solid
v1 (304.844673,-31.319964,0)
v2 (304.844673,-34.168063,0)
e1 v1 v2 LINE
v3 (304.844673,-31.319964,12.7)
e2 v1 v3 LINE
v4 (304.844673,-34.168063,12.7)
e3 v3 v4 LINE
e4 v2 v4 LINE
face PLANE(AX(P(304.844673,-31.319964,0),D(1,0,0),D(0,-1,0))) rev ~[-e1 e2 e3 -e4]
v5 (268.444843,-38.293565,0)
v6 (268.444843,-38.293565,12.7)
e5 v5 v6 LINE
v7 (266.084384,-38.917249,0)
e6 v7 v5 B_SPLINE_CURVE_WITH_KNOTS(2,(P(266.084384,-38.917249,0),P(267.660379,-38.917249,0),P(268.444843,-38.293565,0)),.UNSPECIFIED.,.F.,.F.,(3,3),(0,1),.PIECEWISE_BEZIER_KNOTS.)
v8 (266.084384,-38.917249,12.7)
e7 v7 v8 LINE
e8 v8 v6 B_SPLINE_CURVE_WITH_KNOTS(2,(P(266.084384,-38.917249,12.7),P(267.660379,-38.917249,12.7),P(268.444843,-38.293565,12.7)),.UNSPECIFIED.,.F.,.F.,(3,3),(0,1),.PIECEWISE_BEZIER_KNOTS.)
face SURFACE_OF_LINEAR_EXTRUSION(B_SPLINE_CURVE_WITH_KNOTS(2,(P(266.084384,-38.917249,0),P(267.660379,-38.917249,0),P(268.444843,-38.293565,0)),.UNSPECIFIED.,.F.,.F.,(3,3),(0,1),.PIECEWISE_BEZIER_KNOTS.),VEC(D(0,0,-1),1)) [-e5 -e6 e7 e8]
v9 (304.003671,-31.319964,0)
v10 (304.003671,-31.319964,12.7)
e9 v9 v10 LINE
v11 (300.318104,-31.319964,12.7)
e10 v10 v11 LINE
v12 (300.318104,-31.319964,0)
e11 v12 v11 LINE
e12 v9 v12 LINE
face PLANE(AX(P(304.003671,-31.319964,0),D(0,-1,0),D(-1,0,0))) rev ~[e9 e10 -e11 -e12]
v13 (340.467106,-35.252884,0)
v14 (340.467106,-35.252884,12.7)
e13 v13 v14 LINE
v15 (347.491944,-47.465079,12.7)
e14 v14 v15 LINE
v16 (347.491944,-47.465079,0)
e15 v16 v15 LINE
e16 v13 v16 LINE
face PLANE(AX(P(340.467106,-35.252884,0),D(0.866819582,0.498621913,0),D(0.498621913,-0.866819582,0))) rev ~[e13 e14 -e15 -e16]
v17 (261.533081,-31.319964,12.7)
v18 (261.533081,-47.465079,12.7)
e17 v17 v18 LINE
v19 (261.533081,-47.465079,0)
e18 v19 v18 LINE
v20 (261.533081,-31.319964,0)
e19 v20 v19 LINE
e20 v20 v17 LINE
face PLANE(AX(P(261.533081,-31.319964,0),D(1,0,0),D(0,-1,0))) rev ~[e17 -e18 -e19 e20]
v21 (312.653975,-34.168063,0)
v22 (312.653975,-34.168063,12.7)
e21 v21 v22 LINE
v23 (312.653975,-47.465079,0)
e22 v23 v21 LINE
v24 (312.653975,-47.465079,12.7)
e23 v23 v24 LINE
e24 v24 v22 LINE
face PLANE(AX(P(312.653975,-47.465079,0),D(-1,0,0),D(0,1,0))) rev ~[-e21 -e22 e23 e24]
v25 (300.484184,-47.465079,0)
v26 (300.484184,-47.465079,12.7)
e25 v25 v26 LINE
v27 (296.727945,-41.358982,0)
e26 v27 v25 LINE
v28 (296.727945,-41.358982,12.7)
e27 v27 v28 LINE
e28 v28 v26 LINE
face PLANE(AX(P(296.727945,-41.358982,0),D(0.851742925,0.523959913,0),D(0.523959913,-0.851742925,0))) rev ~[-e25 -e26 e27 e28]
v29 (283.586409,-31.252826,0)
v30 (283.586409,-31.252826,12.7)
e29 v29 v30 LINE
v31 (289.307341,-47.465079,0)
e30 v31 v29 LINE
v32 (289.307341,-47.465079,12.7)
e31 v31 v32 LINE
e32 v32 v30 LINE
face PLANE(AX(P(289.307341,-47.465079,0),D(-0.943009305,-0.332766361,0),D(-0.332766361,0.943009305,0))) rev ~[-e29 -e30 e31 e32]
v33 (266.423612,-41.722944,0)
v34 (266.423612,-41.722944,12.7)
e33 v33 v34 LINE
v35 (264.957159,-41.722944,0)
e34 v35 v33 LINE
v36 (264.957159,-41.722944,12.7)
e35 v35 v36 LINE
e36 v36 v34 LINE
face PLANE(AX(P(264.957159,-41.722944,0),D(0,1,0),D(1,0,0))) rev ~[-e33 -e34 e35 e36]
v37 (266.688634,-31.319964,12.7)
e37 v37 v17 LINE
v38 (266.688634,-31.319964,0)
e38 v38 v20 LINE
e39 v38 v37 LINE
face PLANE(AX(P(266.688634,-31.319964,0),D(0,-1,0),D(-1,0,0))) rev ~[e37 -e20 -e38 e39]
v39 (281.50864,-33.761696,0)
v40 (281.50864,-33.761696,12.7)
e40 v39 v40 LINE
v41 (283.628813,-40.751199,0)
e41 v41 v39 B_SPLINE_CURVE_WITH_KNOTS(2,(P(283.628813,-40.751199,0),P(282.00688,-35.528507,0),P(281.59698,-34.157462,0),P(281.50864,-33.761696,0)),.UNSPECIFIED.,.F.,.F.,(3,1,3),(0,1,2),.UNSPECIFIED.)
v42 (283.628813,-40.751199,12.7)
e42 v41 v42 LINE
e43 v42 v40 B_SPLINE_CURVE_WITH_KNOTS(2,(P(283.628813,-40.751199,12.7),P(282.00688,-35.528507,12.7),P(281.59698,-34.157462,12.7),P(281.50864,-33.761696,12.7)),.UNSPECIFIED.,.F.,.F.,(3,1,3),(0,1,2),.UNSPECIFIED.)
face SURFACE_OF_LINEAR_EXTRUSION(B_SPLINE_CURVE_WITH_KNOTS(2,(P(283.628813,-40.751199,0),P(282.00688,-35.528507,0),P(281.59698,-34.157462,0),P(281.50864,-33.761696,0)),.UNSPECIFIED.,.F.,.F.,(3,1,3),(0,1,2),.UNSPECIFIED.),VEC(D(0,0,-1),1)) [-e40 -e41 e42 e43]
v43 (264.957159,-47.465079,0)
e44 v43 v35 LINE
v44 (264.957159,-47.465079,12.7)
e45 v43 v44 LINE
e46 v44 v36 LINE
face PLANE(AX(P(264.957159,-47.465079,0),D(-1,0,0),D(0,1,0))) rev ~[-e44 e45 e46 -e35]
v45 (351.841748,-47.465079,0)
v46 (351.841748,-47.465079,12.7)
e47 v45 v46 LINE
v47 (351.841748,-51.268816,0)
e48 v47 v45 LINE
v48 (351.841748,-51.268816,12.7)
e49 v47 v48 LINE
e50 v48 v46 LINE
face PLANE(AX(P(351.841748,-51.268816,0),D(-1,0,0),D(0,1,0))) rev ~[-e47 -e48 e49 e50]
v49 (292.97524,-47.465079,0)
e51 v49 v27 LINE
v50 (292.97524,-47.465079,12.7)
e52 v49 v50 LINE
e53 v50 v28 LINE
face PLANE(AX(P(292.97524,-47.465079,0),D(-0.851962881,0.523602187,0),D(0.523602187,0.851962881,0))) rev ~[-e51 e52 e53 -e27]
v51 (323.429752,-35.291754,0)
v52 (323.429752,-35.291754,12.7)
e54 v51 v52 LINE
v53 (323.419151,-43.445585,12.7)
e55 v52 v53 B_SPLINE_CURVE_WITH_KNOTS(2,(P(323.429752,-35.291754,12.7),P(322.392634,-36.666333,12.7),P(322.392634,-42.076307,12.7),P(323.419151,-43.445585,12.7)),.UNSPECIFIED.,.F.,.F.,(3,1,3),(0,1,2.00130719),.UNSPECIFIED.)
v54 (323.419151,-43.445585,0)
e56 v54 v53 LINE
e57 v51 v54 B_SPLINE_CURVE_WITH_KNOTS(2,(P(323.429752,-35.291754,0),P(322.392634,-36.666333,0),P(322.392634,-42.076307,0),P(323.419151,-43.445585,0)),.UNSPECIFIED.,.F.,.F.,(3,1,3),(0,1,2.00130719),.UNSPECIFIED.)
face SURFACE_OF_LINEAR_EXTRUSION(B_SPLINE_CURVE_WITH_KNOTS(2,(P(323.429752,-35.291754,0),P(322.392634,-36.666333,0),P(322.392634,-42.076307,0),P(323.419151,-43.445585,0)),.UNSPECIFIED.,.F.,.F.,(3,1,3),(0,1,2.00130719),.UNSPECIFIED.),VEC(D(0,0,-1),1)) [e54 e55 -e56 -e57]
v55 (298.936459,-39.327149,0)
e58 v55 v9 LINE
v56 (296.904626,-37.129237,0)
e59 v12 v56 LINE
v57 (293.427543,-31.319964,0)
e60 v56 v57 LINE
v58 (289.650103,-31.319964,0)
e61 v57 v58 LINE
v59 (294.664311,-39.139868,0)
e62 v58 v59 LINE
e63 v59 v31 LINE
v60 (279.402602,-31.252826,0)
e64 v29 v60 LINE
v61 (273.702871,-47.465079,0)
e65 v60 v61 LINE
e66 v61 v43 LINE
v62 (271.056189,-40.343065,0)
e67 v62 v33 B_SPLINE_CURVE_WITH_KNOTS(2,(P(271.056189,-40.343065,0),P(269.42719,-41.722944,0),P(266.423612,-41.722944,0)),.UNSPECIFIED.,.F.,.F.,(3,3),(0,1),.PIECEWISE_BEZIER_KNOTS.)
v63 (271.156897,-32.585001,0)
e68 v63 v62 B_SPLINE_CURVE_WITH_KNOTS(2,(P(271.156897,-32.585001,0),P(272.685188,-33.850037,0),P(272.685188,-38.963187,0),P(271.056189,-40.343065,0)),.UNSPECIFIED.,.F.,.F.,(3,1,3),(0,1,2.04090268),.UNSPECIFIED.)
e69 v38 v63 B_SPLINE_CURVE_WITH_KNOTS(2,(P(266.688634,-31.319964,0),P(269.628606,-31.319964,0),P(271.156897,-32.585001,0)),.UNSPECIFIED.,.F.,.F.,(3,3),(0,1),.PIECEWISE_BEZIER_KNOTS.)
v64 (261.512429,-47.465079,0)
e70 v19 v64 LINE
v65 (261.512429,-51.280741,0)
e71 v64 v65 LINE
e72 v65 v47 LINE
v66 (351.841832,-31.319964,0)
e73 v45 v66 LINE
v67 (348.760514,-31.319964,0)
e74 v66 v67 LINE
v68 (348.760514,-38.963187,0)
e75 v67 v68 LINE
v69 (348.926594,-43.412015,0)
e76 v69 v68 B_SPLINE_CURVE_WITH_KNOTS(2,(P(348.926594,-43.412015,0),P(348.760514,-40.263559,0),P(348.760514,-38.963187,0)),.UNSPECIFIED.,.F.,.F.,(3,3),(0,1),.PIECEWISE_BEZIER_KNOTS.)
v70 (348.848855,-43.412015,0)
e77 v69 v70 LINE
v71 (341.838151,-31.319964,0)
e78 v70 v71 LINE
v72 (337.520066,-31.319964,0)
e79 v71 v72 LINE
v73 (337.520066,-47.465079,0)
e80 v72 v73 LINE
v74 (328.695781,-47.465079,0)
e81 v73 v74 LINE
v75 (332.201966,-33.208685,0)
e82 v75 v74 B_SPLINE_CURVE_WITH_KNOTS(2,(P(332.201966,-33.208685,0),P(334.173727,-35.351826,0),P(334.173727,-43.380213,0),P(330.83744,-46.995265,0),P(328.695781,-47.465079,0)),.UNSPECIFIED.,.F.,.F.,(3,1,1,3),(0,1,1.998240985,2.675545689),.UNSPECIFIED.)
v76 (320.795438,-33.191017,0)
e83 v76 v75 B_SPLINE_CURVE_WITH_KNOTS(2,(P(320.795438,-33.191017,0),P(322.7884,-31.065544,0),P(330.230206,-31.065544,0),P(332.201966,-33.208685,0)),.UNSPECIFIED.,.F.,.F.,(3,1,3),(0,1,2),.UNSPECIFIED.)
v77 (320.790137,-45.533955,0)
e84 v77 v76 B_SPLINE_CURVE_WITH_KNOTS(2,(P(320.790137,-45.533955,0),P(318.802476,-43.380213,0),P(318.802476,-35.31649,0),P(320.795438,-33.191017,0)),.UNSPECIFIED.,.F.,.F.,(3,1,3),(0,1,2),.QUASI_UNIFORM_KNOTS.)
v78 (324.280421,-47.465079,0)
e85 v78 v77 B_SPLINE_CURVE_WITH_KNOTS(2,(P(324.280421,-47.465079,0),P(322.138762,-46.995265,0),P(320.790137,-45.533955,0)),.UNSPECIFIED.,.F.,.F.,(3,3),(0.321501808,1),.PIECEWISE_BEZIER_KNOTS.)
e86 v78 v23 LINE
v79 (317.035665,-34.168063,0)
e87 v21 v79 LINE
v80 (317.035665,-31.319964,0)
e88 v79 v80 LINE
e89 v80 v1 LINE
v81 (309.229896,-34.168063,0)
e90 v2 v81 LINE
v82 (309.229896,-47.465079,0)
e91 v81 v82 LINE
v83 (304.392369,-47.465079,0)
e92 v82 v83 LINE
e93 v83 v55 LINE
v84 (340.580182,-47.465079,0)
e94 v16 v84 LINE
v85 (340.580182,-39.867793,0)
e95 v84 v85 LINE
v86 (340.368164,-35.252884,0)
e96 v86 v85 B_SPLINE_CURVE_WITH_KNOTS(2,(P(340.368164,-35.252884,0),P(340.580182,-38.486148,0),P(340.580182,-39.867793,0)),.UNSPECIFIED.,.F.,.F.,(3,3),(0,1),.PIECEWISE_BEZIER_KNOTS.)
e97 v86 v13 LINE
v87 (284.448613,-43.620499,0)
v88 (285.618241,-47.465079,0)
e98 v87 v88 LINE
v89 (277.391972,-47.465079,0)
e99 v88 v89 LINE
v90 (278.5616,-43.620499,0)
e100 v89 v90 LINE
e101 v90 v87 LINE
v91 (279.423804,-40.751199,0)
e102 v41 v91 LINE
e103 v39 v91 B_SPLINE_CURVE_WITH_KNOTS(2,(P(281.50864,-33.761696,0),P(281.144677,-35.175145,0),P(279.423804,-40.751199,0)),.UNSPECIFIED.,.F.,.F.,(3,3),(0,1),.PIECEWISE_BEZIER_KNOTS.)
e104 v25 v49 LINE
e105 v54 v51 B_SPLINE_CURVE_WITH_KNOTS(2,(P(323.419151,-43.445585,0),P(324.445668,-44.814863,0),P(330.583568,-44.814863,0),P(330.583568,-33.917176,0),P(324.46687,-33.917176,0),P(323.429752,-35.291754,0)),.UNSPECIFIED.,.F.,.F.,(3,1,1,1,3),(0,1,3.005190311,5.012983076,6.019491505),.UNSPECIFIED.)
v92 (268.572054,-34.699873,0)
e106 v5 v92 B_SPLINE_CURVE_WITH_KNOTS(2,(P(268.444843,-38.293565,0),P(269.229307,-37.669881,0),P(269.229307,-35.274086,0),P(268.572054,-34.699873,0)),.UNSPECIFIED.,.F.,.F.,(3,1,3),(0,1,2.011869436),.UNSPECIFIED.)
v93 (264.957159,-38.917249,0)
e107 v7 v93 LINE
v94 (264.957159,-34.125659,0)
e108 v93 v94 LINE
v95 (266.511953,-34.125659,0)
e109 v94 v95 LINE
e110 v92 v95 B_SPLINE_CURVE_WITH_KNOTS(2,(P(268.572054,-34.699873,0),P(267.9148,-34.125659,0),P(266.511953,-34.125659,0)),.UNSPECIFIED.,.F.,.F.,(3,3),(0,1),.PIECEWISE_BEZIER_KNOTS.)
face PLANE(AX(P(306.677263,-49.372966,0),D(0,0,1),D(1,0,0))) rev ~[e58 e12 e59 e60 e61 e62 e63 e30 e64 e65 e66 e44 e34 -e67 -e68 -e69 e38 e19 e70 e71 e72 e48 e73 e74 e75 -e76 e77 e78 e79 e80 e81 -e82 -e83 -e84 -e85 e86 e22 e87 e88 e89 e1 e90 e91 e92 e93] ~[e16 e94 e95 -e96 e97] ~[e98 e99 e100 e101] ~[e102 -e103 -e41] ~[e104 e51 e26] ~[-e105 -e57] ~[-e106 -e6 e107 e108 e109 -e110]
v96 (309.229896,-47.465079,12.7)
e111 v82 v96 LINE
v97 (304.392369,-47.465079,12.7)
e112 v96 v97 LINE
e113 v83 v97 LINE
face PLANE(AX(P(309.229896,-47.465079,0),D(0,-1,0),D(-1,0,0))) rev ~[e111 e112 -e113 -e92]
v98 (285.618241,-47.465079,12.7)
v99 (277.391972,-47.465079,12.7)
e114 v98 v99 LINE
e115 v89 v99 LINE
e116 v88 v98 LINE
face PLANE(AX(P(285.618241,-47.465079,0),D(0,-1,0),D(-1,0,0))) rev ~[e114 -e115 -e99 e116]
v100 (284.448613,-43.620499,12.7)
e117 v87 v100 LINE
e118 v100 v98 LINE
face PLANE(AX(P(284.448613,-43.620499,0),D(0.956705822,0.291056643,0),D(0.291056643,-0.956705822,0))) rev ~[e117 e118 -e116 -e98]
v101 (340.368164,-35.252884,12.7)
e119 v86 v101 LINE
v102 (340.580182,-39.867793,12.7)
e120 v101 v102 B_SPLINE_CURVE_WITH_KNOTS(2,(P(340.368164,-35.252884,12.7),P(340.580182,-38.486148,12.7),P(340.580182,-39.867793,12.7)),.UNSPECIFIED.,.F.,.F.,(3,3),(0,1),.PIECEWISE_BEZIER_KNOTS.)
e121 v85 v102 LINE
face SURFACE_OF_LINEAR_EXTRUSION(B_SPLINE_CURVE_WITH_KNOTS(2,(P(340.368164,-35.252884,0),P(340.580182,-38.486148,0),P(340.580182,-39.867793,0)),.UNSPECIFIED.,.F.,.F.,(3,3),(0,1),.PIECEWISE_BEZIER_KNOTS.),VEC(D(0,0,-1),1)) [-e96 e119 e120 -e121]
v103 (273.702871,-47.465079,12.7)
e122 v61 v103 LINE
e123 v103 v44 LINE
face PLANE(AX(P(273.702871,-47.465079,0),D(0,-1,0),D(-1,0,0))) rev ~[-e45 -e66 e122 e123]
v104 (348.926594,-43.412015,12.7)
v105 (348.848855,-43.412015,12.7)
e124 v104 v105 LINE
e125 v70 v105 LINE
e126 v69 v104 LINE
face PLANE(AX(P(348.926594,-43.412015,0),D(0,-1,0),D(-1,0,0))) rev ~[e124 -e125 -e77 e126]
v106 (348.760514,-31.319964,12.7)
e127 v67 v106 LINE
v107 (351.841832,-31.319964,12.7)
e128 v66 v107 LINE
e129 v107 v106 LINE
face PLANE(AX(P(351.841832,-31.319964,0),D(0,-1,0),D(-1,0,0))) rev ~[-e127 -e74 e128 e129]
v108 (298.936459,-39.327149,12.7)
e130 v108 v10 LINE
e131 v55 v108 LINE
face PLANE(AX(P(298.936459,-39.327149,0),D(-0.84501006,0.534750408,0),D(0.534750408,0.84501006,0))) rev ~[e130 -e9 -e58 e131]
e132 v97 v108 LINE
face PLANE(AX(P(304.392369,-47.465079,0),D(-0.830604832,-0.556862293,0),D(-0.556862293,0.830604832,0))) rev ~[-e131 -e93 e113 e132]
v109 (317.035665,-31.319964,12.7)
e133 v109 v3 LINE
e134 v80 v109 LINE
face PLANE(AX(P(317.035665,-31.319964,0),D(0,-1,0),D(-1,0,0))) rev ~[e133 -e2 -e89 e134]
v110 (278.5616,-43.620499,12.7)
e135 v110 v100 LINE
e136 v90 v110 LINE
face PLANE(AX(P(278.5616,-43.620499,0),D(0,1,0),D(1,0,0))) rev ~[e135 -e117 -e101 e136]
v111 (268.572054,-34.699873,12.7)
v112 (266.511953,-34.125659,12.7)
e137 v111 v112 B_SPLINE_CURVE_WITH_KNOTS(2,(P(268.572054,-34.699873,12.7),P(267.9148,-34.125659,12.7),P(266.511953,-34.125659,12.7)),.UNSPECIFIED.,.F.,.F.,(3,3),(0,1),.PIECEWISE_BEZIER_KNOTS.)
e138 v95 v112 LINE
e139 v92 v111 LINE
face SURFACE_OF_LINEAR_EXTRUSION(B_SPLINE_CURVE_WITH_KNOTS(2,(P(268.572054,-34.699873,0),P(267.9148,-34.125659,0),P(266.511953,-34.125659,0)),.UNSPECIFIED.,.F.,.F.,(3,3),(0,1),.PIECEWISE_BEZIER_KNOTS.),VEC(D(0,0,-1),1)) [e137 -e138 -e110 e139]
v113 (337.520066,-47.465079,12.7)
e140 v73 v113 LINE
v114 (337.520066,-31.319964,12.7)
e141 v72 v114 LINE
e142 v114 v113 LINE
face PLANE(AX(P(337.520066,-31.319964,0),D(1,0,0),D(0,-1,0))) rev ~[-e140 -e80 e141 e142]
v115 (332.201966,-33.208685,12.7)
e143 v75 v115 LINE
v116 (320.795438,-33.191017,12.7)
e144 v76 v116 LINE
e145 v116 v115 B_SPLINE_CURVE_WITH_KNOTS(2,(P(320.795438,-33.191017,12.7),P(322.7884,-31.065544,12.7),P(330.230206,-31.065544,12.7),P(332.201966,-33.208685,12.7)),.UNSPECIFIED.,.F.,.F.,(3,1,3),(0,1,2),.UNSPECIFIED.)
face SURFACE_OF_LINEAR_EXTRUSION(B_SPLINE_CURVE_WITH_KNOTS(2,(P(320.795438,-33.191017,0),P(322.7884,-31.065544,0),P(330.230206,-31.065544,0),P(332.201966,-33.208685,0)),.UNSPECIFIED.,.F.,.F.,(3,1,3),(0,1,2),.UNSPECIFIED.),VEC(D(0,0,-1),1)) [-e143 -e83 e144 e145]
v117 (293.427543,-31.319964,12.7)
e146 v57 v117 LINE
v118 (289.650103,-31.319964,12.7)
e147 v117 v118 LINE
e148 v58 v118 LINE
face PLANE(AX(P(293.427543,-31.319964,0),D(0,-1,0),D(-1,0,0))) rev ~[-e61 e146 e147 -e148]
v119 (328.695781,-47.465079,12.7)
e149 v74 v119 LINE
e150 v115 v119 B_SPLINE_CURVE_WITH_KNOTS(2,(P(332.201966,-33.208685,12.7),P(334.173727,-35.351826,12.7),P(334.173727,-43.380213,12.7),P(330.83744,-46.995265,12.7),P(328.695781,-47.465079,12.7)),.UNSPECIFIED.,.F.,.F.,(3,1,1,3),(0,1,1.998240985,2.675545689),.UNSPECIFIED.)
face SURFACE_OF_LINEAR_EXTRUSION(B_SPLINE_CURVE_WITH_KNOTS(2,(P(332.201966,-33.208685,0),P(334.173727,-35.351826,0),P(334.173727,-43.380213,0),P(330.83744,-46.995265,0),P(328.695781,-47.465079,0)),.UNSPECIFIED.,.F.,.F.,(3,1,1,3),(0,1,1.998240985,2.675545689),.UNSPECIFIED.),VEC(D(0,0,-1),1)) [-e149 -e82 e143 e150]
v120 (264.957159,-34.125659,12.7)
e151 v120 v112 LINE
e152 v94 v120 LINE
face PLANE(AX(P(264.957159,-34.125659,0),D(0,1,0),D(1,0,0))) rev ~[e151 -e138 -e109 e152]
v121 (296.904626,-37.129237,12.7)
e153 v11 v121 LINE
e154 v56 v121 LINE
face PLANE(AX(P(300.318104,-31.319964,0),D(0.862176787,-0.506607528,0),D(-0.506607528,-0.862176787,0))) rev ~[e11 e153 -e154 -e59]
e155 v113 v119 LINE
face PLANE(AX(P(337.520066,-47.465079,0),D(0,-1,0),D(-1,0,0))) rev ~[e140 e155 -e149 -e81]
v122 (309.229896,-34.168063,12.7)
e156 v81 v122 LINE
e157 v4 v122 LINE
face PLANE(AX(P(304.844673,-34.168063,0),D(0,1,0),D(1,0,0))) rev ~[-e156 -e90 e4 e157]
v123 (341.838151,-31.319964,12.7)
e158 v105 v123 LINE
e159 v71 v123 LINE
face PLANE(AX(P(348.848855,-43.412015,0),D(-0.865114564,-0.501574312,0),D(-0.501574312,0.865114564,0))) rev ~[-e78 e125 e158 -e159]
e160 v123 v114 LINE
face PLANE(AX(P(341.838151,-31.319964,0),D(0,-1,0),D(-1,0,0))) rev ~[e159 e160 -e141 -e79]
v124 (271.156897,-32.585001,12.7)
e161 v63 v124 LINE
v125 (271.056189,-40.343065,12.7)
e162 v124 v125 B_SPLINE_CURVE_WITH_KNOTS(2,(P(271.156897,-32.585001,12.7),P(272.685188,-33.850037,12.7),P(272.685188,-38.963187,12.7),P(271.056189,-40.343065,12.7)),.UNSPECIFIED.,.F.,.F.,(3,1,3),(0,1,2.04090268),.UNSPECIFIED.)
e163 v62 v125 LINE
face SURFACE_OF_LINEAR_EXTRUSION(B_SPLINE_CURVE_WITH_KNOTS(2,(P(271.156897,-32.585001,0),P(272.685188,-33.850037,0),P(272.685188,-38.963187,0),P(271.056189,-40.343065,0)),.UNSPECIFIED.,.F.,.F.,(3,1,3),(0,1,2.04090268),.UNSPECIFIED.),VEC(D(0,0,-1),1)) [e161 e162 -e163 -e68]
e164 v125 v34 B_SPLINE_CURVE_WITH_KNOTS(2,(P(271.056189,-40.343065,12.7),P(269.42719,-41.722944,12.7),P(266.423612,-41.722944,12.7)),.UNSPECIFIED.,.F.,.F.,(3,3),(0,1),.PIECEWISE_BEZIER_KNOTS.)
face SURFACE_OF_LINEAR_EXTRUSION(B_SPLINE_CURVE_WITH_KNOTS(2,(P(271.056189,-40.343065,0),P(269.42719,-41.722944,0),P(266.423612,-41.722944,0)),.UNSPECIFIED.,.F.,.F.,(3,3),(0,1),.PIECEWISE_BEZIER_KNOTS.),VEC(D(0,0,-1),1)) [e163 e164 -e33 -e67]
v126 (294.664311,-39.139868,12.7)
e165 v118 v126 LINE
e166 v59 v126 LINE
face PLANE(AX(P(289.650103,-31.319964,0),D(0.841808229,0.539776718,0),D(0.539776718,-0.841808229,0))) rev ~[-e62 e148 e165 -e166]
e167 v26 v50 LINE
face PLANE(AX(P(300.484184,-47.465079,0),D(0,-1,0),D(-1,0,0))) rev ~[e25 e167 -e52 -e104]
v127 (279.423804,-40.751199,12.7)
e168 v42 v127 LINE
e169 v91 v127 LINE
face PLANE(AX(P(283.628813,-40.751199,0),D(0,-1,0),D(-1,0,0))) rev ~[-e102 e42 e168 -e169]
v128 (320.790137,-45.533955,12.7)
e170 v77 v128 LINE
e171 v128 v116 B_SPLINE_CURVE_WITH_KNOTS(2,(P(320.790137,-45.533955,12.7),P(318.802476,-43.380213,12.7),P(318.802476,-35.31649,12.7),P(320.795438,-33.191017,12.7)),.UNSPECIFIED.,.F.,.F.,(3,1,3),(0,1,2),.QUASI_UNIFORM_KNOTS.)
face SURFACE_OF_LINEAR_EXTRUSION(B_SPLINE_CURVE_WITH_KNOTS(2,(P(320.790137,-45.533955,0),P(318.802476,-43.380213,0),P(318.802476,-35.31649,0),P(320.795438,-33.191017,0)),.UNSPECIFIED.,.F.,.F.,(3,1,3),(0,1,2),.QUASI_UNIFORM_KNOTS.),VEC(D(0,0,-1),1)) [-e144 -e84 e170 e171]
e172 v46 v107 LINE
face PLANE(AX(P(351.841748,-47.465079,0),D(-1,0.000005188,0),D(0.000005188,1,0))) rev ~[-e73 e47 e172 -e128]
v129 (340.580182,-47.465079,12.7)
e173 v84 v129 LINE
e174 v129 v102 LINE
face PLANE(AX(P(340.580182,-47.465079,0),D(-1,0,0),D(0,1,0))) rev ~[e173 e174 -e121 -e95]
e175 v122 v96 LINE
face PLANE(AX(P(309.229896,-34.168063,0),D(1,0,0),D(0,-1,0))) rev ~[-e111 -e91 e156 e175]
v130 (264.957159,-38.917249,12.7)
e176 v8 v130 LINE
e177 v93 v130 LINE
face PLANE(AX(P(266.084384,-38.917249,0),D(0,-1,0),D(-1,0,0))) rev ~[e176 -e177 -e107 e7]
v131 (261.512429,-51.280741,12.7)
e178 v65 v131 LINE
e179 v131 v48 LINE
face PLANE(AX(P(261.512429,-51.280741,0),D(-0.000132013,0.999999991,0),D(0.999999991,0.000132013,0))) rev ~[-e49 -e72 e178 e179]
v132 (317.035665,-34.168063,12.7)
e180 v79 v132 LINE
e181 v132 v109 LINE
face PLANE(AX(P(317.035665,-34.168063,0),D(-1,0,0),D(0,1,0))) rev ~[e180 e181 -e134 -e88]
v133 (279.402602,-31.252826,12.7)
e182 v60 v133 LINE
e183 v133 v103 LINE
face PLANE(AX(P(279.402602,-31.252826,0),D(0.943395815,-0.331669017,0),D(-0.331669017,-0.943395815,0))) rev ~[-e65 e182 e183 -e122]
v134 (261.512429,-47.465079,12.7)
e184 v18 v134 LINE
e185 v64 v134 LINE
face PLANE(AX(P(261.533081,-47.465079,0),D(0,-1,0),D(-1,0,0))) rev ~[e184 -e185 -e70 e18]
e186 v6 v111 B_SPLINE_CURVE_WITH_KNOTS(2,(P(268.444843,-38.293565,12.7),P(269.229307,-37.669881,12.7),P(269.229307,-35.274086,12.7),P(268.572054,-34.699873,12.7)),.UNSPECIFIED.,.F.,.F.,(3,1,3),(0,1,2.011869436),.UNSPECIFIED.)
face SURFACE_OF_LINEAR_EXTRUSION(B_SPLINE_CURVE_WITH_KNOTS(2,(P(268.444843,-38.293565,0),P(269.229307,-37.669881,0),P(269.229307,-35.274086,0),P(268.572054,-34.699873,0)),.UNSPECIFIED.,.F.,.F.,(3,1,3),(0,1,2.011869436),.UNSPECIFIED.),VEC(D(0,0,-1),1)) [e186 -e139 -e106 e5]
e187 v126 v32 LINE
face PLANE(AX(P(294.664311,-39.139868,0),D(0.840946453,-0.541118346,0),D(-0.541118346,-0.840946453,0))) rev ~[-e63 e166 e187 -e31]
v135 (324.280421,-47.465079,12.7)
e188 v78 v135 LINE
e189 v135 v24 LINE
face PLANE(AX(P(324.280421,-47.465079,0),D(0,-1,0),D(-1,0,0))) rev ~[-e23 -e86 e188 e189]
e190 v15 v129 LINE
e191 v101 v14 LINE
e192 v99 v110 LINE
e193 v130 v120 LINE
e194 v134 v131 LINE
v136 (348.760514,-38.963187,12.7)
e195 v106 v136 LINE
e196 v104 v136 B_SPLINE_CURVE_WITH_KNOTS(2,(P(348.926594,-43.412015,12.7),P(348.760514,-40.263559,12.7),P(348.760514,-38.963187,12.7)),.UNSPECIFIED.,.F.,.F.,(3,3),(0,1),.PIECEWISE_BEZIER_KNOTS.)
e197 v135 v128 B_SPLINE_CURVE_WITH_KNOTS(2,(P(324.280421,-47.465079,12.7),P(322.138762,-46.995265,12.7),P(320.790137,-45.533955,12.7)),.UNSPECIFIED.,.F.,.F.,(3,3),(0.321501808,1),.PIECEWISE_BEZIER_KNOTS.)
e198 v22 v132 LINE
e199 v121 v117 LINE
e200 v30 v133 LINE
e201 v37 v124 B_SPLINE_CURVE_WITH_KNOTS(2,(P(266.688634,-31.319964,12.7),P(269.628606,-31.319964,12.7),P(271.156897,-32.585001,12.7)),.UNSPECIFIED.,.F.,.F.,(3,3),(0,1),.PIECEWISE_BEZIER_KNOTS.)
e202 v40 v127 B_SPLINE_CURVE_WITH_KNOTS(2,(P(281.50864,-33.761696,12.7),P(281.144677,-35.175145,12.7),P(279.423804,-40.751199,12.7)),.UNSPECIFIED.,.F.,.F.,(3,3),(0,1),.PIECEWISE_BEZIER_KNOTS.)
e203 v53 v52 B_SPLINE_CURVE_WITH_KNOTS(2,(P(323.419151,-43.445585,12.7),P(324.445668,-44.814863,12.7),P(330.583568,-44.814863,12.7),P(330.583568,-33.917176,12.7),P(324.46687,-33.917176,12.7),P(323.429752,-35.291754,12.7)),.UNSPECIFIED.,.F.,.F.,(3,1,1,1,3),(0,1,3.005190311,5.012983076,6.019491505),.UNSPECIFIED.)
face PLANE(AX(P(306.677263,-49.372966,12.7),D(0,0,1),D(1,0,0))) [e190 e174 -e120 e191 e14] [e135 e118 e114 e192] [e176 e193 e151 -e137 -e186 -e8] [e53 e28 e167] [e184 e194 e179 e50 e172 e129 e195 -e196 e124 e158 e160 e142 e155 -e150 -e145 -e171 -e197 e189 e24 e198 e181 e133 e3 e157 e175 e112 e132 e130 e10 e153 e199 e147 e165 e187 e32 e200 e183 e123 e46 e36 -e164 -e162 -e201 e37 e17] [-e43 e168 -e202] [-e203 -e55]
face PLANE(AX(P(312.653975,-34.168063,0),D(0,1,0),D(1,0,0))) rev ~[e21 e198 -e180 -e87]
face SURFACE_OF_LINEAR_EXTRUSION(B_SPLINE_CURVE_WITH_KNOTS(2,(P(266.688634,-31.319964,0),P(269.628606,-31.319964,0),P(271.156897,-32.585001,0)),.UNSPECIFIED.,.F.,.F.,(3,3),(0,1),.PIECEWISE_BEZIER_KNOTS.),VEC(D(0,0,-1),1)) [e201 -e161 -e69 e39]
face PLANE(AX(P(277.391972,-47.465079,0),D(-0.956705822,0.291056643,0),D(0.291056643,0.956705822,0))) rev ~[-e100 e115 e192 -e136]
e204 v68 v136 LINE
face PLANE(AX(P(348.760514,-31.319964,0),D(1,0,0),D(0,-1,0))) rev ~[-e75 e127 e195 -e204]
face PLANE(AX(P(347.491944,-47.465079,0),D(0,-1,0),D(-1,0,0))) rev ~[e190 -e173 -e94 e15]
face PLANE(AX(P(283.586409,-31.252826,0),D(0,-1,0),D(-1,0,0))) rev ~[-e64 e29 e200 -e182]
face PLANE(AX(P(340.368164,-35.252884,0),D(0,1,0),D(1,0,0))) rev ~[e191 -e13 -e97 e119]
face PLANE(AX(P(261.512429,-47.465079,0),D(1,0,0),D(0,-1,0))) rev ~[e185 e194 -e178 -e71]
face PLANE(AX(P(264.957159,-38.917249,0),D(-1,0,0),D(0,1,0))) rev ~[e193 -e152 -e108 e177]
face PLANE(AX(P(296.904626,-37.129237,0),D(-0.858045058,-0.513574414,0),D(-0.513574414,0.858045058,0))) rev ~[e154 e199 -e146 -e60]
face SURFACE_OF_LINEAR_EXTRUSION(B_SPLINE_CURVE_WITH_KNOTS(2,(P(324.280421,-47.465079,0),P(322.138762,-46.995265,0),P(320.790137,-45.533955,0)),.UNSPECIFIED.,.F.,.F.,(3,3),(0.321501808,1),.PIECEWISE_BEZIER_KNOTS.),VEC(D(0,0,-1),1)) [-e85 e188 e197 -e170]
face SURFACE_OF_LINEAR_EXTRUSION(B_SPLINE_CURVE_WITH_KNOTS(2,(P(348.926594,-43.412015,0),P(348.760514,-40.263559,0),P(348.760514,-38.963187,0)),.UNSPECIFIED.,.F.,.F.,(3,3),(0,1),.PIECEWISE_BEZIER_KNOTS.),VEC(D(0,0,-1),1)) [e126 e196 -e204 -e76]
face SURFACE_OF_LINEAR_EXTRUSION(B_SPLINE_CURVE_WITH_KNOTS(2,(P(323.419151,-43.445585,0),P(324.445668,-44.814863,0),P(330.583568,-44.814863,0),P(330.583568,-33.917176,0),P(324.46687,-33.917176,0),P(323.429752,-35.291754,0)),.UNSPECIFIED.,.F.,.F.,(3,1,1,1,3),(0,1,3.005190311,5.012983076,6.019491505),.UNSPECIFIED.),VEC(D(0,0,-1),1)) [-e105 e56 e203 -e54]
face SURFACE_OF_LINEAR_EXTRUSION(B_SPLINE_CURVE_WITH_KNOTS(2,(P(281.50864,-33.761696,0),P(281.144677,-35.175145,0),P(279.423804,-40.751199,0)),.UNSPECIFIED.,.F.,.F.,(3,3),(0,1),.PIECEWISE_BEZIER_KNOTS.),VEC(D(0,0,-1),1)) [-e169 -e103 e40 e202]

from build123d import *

# Parameters (mm, degrees)
F1_DEPTH = 12.7


# Not quite as in the source:
# - ends of sketch curves that miss each other by under 0.0002 mm in the source are joined


with BuildPart() as f1:
    # F0 (on Top) → F1 (new body)
    with BuildSketch(Plane.XY):
        with BuildLine():
            Line((261.5330806499, -47.4650785327), (261.5124285221, -47.4650785327))
            Line((261.5124285221, -47.4650785327), (261.5124285221, -51.2807406485))
            Line((261.5124285221, -51.2807406485), (351.8417477608, -51.2688159943))
            Line((351.8417477608, -51.2688159943), (351.8417477608, -47.4650785327))
            Line((351.8417477608, -47.4650785327), (347.4919441154, -47.4650785327))
            Line((347.4919441154, -47.4650785327), (340.5801815182, -47.4650785327))
            Line((340.5801815182, -47.4650785327), (337.5200657671, -47.4650785327))
            Line((337.5200657671, -47.4650785327), (328.6957807677, -47.4650785327))
            add(Edge.make_bspline(
                [(328.6957807677, -47.4650785327), (327.6809699352, -47.6876966532), (326.488101131, -47.6876966532)],
                knots=[0.6784981919, 0.6784981919, 0.6784981919, 1, 1, 1], degree=2))
            add(Edge.make_bspline(
                [(326.488101131, -47.6876966532), (325.2952323268, -47.6876966532), (324.2804214942, -47.4650785327)],
                knots=[0, 0, 0, 0.3215018081, 0.3215018081, 0.3215018081], degree=2))
            Line((324.2804214942, -47.4650785327), (312.6539750738, -47.4650785327))
            Line((312.6539750738, -47.4650785327), (309.2298963638, -47.4650785327))
            Line((309.2298963638, -47.4650785327), (304.39236927, -47.4650785327))
            Line((304.39236927, -47.4650785327), (300.4841844886, -47.4650785327))
            Line((300.4841844886, -47.4650785327), (292.9752399493, -47.4650785327))
            Line((292.9752399493, -47.4650785327), (289.3073413931, -47.4650785327))
            Line((289.3073413931, -47.4650785327), (285.6182411112, -47.4650785327))
            Line((285.6182411112, -47.4650785327), (277.391971517, -47.4650785327))
            Line((277.391971517, -47.4650785327), (273.7028712351, -47.4650785327))
            Line((273.7028712351, -47.4650785327), (264.9571593599, -47.4650785327))
            Line((264.9571593599, -47.4650785327), (261.5330806499, -47.4650785327))
        make_face()
        with BuildLine():
            Line((261.5330806499, -31.3199643679), (261.5330806499, -47.4650785327))
            Line((261.5330806499, -47.4650785327), (264.9571593599, -47.4650785327))
            Line((264.9571593599, -47.4650785327), (264.9571593599, -41.7229444732))
            Line((264.9571593599, -41.7229444732), (266.4236120581, -41.7229444732))
            add(Edge.make_bspline(
                [(271.0561891363, -40.3430654884), (269.4271898739, -41.7229444732), (266.4236120581, -41.7229444732)],
                knots=[0, 0, 0, 1, 1, 1], degree=2))
            add(Edge.make_bspline(
                [(272.6851883987, -36.3553742354), (272.6851883987, -38.9631865037), (271.0561891363, -40.3430654884)],
                knots=[0, 0, 0, 1, 1, 1], degree=2))
            add(Edge.make_bspline(
                [(271.1568973336, -32.5850006714), (272.6851883987, -33.850036975), (272.6851883987, -36.3553742354)],
                knots=[0, 0, 0, 1, 1, 1], degree=2))
            add(Edge.make_bspline(
                [(266.6886336301, -31.3199643679), (269.6286062686, -31.3199643679), (271.1568973336, -32.5850006714)],
                knots=[0, 0, 0, 1, 1, 1], degree=2))
            Line((266.6886336301, -31.3199643679), (261.5330806499, -31.3199643679))
        make_face()
        with BuildLine():
            Line((266.084384446, -38.9172494312), (264.9571593599, -38.9172494312))
            Line((264.9571593599, -38.9172494312), (264.9571593599, -34.1256594099))
            Line((264.9571593599, -34.1256594099), (266.5119525821, -34.1256594099))
            add(Edge.make_bspline(
                [(268.5720536016, -34.6998728158), (267.9148001031, -34.1256594099), (266.5119525821, -34.1256594099)],
                knots=[0, 0, 0, 1, 1, 1], degree=2))
            add(Edge.make_bspline(
                [(269.2293071001, -36.479050969), (269.2293071001, -35.2740862218), (268.5720536016, -34.6998728158)],
                knots=[0, 0, 0, 1, 1, 1], degree=2))
            add(Edge.make_bspline(
                [(268.4448432471, -38.2935653318), (269.2293071001, -37.6698812324), (269.2293071001, -36.479050969)],
                knots=[0, 0, 0, 1, 1, 1], degree=2))
            add(Edge.make_bspline(
                [(266.084384446, -38.9172494312), (267.660379394, -38.9172494312), (268.4448432471, -38.2935653318)],
                knots=[0, 0, 0, 1, 1, 1], degree=2))
        make_face(mode=Mode.SUBTRACT)
        with BuildLine():
            Line((347.4919441154, -47.4650785327), (351.8417477608, -47.4650785327))
            Line((351.8417477608, -47.4650785327), (351.8418315167, -31.3199643679))
            Line((351.8418315167, -31.3199643679), (348.7605140399, -31.3199643679))
            Line((348.7605140399, -31.3199643679), (348.7605140399, -38.9631865037))
            add(Edge.make_bspline(
                [(348.926594225, -43.4120152919), (348.7605140399, -40.2635590168), (348.7605140399, -38.9631865037)],
                knots=[0, 0, 0, 1, 1, 1], degree=2))
            Line((348.926594225, -43.4120152919), (348.8488545639, -43.4120152919))
            Line((348.8488545639, -43.4120152919), (341.8381505799, -31.3199643679))
            Line((341.8381505799, -31.3199643679), (337.5200657671, -31.3199643679))
            Line((337.5200657671, -31.3199643679), (337.5200657671, -47.4650785327))
            Line((337.5200657671, -47.4650785327), (340.5801815182, -47.4650785327))
            Line((340.5801815182, -47.4650785327), (340.5801815182, -39.8677934694))
            add(Edge.make_bspline(
                [(340.3681642606, -35.252884496), (340.5801815182, -38.4861476741), (340.5801815182, -39.8677934694)],
                knots=[0, 0, 0, 1, 1, 1], degree=2))
            Line((340.3681642606, -35.252884496), (340.4671056475, -35.252884496))
            Line((340.4671056475, -35.252884496), (347.4919441154, -47.4650785327))
        make_face()
        Polygon((279.4026018431, -31.2528255696), (273.7028712351, -47.4650785327), (277.391971517, -47.4650785327), (278.5616000547, -43.6204989286), (284.4486125735, -43.6204989286), (285.6182411112, -47.4650785327), (289.3073413931, -47.4650785327), (283.5864090594, -31.2528255696), align=None)
        with BuildLine():
            add(Edge.make_bspline(
                [(283.6288125109, -40.7511987093), (282.0068804904, -35.5285069309), (281.8019304747, -34.8429844647)],
                knots=[0, 0, 0, 1, 1, 1], degree=2))
            Line((283.6288125109, -40.7511987093), (279.4238035688, -40.7511987093))
            add(Edge.make_bspline(
                [(281.5086399351, -33.761696451), (281.1446769762, -35.1751448349), (279.4238035688, -40.7511987093)],
                knots=[0, 0, 0, 1, 1, 1], degree=2))
            add(Edge.make_bspline(
                [(281.8019304747, -34.8429844647), (281.596980459, -34.1574619985), (281.5086399351, -33.761696451)],
                knots=[0, 0, 0, 1, 1, 1], degree=2))
        make_face(mode=Mode.SUBTRACT)
        Polygon((294.664310768, -39.1398675517), (289.3073413931, -47.4650785327), (292.9752399493, -47.4650785327), (296.7279454084, -41.3589815143), (300.4841844886, -47.4650785327), (304.39236927, -47.4650785327), (298.9364585083, -39.3271494625), (304.0036709644, -31.3199643679), (300.3181043035, -31.3199643679), (296.9046264564, -37.1292372256), (293.4275434321, -31.3199643679), (289.6501026262, -31.3199643679), align=None)
        with BuildLine():
            add(Edge.make_bspline(
                [(328.6957807677, -47.4650785327), (327.6809699352, -47.6876966532), (326.488101131, -47.6876966532)],
                knots=[0.6784981919, 0.6784981919, 0.6784981919, 1, 1, 1], degree=2))
            Line((328.6957807677, -47.4650785327), (324.2804214942, -47.4650785327))
            add(Edge.make_bspline(
                [(326.488101131, -47.6876966532), (325.2952323268, -47.6876966532), (324.2804214942, -47.4650785327)],
                knots=[0, 0, 0, 0.3215018081, 0.3215018081, 0.3215018081], degree=2))
        make_face()
        with BuildLine():
            Line((324.2804214942, -47.4650785327), (328.6957807677, -47.4650785327))
            add(Edge.make_bspline(
                [(332.1860649285, -45.5339546782), (330.837439998, -46.995264714), (328.6957807677, -47.4650785327)],
                knots=[0, 0, 0, 0.6784981919, 0.6784981919, 0.6784981919], degree=2))
            add(Edge.make_bspline(
                [(334.1737267183, -39.369552914), (334.1737267183, -43.3802127033), (332.1860649285, -45.5339546782)],
                knots=[0, 0, 0, 1, 1, 1], degree=2))
            add(Edge.make_bspline(
                [(332.2019662228, -33.2086847708), (334.1737267183, -35.3518258829), (334.1737267183, -39.369552914)],
                knots=[0, 0, 0, 1, 1, 1], degree=2))
            add(Edge.make_bspline(
                [(326.5093028567, -31.0655436588), (330.2302057273, -31.0655436588), (332.2019662228, -33.2086847708)],
                knots=[0, 0, 0, 1, 1, 1], degree=2))
            add(Edge.make_bspline(
                [(320.7954377649, -33.191016666), (322.7883999862, -31.0655436588), (326.5093028567, -31.0655436588)],
                knots=[0, 0, 0, 1, 1, 1], degree=2))
            add(Edge.make_bspline(
                [(318.8024755436, -39.3483511883), (318.8024755436, -35.3164896733), (320.7954377649, -33.191016666)],
                knots=[0, 0, 0, 1, 1, 1], degree=2))
            add(Edge.make_bspline(
                [(320.7901373335, -45.5339546782), (318.8024755436, -43.3802127033), (318.8024755436, -39.3483511883)],
                knots=[0, 0, 0, 1, 1, 1], degree=2))
            add(Edge.make_bspline(
                [(324.2804214942, -47.4650785327), (322.1387622639, -46.995264714), (320.7901373335, -45.5339546782)],
                knots=[0.3215018081, 0.3215018081, 0.3215018081, 1, 1, 1], degree=2))
        make_face()
        with BuildLine():
            add(Edge.make_bspline(
                [(322.3926344387, -39.369552914), (322.3926344387, -42.0763065692), (323.4191513275, -43.445584691)],
                knots=[0, 0, 0, 1, 1, 1], degree=2))
            add(Edge.make_bspline(
                [(323.4297521903, -35.2917543266), (322.3926344387, -36.6663328799), (322.3926344387, -39.369552914)],
                knots=[0, 0, 0, 1, 1, 1], degree=2))
            add(Edge.make_bspline(
                [(326.5093028567, -33.9171757732), (324.466869942, -33.9171757732), (323.4297521903, -35.2917543266)],
                knots=[0, 0, 0, 1, 1, 1], degree=2))
            add(Edge.make_bspline(
                [(330.5835678232, -39.369552914), (330.5835678232, -33.9171757732), (326.5093028567, -33.9171757732)],
                knots=[0, 0, 0, 1, 1, 1], degree=2))
            add(Edge.make_bspline(
                [(326.488101131, -44.8148628129), (330.5835678232, -44.8148628129), (330.5835678232, -39.369552914)],
                knots=[0, 0, 0, 1, 1, 1], degree=2))
            add(Edge.make_bspline(
                [(323.4191513275, -43.445584691), (324.4456682163, -44.8148628129), (326.488101131, -44.8148628129)],
                knots=[0, 0, 0, 1, 1, 1], degree=2))
        make_face(mode=Mode.SUBTRACT)
        Polygon((309.2298963638, -47.4650785327), (312.6539750738, -47.4650785327), (312.6539750738, -34.1680628614), (317.0356650638, -34.1680628614), (317.0356650638, -31.3199643679), (304.8446727529, -31.3199643679), (304.8446727529, -34.1680628614), (309.2298963638, -34.1680628614), align=None)
    extrude(amount=F1_DEPTH)


solid = f1.part
